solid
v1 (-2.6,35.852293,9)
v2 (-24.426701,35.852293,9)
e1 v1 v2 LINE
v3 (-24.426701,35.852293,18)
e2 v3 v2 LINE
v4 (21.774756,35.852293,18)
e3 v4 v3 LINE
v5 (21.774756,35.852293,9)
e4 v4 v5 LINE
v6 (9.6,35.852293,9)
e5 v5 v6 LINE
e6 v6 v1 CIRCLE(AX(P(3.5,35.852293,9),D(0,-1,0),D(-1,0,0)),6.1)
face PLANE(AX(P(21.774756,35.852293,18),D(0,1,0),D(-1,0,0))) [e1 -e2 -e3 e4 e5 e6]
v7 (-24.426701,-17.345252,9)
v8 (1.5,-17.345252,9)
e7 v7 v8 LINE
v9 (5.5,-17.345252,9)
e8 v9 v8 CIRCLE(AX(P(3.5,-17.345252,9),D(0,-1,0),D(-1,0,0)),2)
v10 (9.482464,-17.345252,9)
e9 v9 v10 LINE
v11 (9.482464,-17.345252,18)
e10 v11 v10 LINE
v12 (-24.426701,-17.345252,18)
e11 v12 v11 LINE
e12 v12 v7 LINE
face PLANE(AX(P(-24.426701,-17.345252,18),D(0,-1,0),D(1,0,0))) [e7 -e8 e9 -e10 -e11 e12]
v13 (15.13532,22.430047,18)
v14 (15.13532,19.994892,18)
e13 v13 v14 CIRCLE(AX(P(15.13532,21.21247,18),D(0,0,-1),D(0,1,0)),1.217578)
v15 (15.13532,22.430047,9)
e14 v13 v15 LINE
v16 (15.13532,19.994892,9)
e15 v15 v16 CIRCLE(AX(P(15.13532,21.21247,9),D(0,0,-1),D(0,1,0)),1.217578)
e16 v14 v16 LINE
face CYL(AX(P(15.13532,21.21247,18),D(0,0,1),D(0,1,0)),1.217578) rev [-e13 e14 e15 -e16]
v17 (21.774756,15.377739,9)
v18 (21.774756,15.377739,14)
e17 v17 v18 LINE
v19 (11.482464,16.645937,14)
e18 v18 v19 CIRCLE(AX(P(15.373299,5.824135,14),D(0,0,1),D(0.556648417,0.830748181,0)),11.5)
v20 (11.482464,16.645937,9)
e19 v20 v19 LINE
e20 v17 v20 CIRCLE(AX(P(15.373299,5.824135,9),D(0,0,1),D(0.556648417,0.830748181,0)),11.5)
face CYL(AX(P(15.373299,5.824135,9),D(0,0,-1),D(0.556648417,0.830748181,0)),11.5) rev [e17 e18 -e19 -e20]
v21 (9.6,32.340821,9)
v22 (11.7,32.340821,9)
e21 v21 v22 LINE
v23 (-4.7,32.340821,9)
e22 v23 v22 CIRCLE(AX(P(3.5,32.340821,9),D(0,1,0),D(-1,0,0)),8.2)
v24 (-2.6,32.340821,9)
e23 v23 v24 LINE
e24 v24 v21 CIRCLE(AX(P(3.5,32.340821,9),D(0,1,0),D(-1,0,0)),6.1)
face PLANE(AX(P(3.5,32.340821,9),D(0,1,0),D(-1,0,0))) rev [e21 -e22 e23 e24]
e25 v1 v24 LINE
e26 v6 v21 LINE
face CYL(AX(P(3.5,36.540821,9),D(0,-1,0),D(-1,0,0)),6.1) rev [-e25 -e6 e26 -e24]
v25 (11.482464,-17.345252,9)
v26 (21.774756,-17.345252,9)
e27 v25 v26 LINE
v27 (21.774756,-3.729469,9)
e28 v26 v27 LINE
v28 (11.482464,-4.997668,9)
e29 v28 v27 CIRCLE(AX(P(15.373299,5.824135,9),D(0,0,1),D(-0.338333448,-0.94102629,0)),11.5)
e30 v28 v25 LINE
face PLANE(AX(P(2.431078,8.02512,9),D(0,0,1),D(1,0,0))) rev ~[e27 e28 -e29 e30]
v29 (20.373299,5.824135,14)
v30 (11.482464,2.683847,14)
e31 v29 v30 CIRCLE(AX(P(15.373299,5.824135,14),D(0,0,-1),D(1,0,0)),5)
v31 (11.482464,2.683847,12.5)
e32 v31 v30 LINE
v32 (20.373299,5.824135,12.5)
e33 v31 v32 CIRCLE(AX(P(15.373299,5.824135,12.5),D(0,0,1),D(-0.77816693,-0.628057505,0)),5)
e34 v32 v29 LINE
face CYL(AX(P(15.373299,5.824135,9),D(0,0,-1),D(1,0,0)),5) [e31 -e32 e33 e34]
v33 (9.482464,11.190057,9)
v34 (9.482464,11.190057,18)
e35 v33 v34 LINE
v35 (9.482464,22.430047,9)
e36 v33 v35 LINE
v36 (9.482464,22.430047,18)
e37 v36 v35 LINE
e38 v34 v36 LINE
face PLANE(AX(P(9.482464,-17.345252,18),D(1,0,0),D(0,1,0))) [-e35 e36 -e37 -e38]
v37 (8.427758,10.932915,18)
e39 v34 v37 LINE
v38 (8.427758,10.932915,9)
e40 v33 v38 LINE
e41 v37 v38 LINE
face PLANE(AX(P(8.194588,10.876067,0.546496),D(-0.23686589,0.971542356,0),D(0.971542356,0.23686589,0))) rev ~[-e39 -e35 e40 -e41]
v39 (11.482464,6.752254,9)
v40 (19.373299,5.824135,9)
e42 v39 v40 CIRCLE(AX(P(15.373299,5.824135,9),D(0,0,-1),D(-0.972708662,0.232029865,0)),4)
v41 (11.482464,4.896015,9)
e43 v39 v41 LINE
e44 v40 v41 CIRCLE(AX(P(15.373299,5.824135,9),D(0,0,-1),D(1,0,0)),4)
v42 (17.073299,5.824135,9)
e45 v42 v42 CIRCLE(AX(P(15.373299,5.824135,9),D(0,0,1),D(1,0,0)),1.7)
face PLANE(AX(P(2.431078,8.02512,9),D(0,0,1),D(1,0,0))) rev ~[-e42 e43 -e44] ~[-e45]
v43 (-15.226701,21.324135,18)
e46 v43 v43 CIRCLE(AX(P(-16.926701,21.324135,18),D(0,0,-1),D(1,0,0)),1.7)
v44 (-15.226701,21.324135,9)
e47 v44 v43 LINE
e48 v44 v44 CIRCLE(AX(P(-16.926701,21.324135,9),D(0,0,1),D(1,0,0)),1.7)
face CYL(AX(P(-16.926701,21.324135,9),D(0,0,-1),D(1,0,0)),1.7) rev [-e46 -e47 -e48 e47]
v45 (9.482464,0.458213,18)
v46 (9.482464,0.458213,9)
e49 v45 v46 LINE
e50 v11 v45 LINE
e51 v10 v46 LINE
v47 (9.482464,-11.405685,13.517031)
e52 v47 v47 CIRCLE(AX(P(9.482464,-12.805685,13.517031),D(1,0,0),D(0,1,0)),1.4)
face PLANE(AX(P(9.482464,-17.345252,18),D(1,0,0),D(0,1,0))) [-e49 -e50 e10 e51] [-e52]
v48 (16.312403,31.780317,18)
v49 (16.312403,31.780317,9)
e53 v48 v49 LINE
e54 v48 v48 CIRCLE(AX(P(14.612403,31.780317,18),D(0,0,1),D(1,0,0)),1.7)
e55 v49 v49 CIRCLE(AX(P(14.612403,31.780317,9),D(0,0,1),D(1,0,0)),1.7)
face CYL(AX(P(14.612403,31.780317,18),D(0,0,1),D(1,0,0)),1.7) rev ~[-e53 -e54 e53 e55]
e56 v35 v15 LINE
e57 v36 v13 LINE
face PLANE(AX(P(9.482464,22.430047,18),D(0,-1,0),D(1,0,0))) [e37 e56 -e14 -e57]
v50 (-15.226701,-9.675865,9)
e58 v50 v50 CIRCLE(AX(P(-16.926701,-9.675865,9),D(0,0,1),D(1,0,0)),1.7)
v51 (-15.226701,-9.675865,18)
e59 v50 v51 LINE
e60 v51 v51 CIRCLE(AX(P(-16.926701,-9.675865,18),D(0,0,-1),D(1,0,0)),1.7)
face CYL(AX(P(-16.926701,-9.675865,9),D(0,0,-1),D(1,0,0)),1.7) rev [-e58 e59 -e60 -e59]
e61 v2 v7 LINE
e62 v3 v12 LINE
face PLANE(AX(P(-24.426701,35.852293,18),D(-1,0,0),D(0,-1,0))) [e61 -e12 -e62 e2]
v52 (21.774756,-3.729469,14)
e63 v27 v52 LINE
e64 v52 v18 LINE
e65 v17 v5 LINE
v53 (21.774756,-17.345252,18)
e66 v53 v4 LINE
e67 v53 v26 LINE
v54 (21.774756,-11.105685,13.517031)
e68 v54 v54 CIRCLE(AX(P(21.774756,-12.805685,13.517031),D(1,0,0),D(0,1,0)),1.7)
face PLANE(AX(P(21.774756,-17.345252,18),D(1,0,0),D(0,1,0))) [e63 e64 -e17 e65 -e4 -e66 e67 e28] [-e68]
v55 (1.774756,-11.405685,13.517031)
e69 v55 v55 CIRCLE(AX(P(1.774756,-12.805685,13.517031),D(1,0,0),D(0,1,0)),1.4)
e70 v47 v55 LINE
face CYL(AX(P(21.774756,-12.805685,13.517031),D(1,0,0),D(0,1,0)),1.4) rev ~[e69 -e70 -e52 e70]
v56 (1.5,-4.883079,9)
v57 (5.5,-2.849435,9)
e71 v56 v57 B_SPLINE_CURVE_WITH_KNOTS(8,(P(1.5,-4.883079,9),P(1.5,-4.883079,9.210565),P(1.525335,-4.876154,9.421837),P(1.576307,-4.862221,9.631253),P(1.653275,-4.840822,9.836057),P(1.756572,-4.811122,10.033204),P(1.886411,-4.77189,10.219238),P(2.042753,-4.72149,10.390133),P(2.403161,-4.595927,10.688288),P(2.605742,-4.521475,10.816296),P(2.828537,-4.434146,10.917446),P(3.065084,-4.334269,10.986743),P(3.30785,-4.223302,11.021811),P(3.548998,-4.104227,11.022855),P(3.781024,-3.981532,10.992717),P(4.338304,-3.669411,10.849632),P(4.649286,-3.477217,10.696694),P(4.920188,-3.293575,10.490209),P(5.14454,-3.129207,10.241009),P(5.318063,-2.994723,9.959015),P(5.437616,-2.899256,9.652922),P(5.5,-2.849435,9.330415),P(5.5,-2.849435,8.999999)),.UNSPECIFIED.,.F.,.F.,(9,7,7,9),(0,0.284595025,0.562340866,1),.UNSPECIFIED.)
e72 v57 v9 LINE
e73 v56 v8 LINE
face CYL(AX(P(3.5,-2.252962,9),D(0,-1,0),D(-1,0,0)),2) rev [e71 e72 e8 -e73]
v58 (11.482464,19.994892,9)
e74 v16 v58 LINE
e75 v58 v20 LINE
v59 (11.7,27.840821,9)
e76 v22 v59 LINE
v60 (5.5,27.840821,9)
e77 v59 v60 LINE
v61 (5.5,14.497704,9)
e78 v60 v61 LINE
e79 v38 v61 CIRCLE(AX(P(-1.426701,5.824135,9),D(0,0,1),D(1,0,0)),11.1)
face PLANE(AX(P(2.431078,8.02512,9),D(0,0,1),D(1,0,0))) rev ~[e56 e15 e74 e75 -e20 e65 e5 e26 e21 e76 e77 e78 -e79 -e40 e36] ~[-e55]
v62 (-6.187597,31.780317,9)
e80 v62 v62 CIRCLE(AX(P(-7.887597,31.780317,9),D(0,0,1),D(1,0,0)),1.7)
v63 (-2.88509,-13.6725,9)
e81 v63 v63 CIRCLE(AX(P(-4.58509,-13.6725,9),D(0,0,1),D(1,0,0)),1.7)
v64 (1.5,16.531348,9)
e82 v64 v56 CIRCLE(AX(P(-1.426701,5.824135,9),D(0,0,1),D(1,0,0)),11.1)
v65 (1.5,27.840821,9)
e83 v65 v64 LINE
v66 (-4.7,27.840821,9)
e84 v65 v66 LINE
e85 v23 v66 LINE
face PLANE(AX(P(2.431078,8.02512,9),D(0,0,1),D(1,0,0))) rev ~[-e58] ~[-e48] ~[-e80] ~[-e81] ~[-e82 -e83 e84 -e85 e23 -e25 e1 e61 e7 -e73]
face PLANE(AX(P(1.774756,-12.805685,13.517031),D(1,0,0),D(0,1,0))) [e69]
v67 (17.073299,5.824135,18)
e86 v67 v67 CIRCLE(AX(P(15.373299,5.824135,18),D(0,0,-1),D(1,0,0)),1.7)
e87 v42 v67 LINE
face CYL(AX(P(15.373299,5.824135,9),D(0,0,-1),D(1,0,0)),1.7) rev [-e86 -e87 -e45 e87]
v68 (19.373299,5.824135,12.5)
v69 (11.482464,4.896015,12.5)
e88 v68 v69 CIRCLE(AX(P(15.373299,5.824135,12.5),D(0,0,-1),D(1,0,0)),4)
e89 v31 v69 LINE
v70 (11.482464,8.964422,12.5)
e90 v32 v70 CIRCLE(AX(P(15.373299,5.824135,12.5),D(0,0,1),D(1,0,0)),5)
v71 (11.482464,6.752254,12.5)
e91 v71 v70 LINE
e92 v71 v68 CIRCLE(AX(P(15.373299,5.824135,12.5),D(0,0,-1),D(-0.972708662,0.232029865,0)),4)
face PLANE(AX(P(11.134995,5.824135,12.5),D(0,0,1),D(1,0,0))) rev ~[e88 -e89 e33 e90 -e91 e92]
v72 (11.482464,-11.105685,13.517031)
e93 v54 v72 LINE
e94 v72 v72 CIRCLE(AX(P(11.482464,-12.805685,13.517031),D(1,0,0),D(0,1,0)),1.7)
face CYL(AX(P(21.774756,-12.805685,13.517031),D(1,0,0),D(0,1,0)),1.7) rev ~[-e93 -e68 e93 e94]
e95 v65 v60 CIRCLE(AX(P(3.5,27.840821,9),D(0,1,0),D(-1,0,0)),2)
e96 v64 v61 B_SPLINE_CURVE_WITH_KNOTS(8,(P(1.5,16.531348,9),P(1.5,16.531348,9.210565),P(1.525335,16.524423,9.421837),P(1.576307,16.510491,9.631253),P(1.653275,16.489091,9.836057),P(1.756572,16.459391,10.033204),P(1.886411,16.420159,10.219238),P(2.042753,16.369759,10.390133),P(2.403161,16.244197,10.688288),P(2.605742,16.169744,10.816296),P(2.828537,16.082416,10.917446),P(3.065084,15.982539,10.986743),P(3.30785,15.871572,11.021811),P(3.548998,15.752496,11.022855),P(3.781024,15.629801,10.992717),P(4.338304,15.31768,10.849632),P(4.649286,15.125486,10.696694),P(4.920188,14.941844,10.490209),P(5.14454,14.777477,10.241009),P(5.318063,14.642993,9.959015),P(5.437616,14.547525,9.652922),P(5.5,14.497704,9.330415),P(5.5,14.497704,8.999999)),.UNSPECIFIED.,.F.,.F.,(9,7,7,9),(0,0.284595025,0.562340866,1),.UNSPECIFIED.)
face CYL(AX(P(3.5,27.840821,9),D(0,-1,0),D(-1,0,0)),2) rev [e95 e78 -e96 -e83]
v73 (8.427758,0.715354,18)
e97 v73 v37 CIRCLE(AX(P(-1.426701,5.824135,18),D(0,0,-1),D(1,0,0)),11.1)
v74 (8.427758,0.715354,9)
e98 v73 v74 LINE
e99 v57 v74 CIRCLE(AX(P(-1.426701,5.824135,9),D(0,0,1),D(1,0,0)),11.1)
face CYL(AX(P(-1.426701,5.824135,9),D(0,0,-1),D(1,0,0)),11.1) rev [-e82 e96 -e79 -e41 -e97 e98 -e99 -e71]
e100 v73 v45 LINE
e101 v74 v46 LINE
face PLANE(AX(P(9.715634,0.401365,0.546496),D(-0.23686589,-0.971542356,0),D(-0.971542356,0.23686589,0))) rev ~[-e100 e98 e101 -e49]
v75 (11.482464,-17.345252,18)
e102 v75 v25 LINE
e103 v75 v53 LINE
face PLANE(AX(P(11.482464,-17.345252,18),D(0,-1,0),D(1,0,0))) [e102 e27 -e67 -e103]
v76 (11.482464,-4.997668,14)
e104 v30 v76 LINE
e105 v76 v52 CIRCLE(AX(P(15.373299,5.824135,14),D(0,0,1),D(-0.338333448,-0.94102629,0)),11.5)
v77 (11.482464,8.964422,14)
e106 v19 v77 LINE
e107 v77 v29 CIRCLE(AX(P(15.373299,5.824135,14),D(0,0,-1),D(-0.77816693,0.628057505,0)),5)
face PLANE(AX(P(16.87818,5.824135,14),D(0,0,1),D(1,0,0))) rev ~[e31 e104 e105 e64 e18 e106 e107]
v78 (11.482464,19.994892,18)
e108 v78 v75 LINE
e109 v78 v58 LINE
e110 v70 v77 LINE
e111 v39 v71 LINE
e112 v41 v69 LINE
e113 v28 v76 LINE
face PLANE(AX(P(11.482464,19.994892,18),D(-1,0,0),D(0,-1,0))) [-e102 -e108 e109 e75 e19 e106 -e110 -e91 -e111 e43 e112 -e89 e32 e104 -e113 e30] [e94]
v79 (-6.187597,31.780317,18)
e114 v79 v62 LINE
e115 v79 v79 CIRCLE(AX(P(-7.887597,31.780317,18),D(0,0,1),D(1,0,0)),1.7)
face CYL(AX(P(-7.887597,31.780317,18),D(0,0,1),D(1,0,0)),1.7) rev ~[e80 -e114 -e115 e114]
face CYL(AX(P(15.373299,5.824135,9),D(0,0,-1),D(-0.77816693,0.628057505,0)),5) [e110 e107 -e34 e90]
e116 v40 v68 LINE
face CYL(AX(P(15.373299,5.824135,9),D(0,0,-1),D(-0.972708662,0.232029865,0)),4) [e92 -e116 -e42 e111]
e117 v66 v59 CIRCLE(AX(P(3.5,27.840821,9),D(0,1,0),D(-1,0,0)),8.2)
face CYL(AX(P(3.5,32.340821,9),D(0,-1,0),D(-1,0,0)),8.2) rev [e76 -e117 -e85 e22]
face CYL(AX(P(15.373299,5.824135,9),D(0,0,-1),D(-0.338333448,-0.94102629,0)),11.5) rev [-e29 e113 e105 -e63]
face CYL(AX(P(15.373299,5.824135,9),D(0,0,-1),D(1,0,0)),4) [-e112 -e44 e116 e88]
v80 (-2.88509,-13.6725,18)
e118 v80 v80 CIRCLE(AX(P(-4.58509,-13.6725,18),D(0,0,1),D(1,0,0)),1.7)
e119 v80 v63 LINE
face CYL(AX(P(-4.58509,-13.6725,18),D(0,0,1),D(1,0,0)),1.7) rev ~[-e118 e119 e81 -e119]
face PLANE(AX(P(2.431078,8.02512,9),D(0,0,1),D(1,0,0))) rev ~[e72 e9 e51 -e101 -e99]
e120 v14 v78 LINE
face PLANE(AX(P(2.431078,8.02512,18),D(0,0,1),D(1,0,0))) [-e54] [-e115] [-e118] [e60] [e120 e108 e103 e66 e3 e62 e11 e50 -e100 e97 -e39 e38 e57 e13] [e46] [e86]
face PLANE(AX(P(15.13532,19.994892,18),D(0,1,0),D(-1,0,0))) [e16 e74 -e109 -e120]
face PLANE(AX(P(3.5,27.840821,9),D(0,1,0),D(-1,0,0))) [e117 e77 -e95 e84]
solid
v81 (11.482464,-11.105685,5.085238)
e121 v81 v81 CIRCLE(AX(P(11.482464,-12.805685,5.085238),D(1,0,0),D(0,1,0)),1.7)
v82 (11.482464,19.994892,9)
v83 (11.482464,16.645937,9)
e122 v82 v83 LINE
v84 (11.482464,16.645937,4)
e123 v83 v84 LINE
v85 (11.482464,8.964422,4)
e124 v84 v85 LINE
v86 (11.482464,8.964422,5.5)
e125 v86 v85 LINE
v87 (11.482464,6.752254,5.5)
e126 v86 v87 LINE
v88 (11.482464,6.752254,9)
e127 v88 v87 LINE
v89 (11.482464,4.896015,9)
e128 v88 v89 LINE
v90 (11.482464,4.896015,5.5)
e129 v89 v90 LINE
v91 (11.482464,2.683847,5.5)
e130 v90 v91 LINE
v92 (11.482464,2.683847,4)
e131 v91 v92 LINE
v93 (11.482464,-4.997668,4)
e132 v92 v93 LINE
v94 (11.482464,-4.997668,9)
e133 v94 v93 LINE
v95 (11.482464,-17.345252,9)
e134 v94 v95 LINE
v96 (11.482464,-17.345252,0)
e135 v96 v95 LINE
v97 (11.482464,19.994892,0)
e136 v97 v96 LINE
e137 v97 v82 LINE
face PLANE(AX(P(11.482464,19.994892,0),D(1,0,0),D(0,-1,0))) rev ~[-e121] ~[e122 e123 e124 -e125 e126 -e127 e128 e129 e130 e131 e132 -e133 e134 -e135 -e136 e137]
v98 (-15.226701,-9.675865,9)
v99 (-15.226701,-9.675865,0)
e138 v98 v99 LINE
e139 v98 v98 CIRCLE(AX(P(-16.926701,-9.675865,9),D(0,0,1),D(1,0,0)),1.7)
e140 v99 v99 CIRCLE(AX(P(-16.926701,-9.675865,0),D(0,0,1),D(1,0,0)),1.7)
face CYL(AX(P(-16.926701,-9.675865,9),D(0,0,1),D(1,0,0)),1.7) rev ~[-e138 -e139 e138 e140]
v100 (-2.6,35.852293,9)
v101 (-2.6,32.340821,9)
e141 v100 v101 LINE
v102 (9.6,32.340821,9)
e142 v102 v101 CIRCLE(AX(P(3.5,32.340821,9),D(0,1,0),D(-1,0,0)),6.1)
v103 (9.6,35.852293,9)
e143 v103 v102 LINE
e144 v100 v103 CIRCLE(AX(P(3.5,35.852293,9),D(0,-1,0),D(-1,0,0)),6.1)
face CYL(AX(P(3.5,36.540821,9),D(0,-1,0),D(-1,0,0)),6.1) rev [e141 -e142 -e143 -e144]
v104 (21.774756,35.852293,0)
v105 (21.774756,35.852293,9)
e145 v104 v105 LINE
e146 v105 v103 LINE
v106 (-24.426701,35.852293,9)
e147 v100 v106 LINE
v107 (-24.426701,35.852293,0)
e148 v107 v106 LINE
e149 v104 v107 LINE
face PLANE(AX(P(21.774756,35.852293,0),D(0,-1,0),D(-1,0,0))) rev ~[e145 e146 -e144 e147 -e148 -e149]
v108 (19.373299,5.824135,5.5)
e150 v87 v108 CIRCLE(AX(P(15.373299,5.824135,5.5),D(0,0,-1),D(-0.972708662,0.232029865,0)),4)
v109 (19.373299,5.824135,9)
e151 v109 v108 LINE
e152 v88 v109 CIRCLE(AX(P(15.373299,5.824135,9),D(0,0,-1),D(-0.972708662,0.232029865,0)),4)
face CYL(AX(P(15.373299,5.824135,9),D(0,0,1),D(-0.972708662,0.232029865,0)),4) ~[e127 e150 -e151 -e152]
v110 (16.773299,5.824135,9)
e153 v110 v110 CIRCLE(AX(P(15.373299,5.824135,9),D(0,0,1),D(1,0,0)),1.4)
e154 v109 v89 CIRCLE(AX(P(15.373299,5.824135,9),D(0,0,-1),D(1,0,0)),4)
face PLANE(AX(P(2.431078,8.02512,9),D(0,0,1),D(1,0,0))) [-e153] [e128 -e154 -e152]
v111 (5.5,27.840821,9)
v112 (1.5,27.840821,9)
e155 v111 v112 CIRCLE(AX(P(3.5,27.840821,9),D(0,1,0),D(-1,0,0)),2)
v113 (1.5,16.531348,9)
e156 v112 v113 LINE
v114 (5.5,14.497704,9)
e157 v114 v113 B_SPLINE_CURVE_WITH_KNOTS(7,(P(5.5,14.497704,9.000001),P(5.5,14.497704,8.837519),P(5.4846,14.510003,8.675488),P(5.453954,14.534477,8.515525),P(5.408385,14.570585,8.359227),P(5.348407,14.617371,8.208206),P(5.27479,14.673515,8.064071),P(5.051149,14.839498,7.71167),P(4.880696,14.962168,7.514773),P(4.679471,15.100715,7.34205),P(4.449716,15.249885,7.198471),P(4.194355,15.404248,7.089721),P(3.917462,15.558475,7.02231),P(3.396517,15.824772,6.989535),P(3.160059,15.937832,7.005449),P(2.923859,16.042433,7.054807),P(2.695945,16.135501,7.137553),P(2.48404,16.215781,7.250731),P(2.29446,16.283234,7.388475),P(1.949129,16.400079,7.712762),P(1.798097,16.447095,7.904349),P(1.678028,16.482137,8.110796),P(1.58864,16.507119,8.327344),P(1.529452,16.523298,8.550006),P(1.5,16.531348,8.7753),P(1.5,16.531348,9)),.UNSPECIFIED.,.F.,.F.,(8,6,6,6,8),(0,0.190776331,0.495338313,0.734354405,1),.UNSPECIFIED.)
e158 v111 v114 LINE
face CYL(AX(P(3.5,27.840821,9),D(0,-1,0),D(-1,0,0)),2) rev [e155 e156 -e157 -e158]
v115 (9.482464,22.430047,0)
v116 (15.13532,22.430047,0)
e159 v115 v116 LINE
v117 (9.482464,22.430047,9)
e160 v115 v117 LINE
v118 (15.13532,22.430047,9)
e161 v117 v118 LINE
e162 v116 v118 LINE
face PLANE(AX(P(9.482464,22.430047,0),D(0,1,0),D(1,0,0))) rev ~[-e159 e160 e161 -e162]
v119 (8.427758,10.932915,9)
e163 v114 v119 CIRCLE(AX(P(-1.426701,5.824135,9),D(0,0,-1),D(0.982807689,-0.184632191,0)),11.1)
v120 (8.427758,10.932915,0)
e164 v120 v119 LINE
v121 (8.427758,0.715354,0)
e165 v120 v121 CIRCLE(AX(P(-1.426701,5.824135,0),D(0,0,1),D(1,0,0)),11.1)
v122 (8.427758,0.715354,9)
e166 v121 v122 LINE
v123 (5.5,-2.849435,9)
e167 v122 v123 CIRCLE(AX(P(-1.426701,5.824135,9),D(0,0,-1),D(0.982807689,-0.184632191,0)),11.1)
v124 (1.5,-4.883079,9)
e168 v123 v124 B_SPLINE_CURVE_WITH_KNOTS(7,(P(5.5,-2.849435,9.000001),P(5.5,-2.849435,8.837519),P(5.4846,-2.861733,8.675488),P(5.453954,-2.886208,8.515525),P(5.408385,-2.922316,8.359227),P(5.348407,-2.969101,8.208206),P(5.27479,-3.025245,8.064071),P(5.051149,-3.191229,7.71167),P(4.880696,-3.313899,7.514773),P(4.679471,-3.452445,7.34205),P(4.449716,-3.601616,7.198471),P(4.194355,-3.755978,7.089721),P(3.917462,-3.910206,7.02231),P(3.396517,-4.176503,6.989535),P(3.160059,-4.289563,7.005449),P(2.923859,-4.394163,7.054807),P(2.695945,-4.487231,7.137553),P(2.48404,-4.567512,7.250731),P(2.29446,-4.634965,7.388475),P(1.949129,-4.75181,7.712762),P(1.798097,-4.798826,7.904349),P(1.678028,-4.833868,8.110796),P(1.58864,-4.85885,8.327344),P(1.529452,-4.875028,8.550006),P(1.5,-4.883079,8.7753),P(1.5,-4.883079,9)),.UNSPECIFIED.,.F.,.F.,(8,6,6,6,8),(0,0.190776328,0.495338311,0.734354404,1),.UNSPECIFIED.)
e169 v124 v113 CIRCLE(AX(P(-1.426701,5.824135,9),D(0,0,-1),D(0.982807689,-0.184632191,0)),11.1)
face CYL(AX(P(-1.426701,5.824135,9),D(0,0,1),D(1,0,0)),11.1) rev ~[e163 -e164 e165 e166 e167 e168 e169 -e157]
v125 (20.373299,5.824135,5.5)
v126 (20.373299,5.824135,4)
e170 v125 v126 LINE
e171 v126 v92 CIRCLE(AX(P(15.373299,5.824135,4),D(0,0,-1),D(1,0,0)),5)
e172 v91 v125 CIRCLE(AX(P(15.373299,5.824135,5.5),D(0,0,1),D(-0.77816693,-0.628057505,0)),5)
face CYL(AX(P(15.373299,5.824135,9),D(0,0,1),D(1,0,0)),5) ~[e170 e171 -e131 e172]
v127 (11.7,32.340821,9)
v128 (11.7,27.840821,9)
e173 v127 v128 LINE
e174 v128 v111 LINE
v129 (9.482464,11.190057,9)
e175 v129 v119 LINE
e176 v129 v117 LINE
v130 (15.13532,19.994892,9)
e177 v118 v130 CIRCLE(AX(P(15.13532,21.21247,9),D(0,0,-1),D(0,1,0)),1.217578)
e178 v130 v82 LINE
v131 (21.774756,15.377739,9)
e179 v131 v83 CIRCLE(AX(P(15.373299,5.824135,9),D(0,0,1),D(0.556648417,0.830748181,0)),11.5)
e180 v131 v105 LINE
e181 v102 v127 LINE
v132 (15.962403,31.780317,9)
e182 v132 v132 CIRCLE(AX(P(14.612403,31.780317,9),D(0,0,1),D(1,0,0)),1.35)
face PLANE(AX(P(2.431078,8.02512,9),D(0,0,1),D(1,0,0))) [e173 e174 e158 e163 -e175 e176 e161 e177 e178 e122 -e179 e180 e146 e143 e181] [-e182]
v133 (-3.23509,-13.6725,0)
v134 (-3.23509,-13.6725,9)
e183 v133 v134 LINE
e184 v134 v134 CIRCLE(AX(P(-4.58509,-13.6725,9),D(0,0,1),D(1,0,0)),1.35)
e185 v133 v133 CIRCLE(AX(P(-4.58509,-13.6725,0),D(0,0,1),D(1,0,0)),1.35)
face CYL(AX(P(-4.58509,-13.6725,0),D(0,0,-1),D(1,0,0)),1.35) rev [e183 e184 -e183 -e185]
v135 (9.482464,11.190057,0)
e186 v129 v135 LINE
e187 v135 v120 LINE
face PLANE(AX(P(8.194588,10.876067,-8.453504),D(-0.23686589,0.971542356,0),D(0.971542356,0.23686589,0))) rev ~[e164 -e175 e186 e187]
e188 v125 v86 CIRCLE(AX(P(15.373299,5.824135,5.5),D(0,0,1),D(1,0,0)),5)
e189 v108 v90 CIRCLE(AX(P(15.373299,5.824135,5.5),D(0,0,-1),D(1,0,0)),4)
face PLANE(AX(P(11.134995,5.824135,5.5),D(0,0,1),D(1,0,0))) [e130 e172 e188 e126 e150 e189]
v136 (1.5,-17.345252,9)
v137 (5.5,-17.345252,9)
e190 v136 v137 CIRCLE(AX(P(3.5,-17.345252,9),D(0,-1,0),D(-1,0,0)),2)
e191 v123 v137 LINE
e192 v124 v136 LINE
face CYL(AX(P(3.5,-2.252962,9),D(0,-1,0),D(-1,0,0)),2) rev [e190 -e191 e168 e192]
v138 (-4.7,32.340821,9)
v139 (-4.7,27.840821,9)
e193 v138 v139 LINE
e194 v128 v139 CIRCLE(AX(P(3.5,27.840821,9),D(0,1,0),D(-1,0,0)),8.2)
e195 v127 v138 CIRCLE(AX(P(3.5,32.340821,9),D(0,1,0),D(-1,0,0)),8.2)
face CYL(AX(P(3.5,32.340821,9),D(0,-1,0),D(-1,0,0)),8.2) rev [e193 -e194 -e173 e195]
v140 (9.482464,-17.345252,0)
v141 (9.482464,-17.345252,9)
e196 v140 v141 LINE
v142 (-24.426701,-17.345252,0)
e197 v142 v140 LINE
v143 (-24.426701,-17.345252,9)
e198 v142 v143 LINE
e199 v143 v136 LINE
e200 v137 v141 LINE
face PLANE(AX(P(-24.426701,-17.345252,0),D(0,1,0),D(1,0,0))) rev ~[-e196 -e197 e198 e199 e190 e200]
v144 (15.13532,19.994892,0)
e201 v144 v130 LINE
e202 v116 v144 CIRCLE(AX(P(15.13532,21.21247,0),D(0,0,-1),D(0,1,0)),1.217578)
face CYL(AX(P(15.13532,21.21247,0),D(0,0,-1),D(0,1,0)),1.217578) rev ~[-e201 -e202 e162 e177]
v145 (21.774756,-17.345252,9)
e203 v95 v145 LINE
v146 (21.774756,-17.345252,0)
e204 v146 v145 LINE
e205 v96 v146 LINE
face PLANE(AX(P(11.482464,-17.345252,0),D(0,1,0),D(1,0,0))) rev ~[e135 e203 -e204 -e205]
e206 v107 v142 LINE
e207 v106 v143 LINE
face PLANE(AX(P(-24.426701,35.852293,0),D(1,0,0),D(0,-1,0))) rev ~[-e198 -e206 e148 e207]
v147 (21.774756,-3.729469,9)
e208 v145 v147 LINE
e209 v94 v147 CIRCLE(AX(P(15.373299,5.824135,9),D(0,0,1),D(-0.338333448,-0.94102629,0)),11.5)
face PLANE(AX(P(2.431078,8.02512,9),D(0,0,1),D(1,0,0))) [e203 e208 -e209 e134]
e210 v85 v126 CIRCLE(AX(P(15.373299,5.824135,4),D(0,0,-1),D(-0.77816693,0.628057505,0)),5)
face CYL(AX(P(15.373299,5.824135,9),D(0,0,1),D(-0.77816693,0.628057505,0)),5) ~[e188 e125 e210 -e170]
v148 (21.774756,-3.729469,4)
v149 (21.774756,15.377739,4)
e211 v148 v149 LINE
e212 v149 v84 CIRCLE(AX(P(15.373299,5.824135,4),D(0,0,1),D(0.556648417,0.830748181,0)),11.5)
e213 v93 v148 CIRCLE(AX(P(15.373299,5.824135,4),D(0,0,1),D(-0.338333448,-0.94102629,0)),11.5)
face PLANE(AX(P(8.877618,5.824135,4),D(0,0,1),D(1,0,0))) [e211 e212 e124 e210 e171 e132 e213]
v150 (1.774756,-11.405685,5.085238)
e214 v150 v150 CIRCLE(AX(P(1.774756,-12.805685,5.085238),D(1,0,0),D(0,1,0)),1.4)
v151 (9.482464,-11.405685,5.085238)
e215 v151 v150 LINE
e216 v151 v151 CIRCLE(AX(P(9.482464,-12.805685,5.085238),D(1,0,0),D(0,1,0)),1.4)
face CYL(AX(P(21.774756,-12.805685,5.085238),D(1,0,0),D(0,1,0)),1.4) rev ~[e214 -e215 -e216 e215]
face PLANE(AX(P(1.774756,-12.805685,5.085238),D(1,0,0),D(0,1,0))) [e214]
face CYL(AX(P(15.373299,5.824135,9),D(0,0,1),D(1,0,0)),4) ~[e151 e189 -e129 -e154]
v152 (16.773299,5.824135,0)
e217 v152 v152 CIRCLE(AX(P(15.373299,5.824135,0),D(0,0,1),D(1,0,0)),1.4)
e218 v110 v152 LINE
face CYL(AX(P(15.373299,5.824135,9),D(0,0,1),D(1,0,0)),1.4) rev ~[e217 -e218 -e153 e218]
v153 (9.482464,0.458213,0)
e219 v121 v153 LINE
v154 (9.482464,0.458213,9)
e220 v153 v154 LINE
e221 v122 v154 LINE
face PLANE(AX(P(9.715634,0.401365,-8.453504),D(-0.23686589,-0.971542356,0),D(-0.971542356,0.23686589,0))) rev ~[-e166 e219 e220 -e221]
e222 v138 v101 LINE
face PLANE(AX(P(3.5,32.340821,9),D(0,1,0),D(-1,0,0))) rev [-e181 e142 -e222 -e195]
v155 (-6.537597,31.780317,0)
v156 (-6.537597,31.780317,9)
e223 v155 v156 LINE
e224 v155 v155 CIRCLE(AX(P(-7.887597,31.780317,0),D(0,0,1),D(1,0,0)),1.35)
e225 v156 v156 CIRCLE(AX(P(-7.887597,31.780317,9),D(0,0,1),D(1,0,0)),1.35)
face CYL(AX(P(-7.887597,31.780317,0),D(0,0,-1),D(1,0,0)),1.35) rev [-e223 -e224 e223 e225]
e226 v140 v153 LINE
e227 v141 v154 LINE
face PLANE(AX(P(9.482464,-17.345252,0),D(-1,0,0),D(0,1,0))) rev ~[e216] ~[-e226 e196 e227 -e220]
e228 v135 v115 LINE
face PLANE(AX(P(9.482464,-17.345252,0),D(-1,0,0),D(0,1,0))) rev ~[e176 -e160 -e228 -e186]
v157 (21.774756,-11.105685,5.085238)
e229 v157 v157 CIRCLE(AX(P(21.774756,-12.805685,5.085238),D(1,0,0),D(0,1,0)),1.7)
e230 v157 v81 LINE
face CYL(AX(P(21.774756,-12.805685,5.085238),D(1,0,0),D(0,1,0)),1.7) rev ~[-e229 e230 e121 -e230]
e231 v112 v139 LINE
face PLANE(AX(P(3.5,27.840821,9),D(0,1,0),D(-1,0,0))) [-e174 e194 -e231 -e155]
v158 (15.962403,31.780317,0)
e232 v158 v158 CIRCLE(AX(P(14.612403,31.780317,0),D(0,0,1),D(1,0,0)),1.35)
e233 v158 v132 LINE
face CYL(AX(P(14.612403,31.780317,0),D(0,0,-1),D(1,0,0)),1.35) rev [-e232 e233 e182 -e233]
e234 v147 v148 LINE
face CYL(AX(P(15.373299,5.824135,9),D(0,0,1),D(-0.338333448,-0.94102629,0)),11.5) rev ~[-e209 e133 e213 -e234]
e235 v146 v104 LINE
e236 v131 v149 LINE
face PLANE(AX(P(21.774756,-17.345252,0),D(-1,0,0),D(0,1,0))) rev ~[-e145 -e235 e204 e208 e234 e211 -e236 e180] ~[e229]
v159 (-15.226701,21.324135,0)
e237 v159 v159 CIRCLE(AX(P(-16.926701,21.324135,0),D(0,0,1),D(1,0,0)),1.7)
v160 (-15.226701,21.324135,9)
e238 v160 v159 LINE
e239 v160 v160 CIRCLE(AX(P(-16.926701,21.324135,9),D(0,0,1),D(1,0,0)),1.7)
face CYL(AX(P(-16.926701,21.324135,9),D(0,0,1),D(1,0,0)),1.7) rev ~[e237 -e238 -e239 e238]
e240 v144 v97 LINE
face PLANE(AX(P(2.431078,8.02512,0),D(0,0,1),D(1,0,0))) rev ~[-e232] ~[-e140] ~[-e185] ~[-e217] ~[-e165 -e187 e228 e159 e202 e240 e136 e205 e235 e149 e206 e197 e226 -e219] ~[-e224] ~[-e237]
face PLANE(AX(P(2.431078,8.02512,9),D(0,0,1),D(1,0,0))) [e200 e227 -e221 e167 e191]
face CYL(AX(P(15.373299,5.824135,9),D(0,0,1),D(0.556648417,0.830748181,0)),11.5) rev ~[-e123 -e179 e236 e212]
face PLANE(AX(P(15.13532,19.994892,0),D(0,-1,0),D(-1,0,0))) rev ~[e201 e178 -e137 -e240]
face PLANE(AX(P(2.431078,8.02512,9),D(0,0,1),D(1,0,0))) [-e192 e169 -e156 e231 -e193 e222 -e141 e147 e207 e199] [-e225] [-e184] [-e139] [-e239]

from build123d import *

# Parameters (mm, degrees)
F0_R           = 1.7
F0_R_2         = 1.35
F1_DEPTH       = 9
F2_R           = 11.1
F2_R_2         = 1.7
F3_DEPTH       = 9.001
F5_DEPTH       = 5
F6_DEPTH       = 3.5
F11_DEPTH      = 9
F13_DEPTH      = 9.001
F14_DEPTH      = 5
F15_DEPTH      = 3.5
F18_R          = 1.4
F19_DEPTH      = 20
F18_R_2        = 1.7
F20_DEPTH      = 11
F21_DEPTH      = 20
F22_DEPTH      = 11
F4_R           = 1.4
F23_DEPTH      = 9.0010001
F4_R_2         = 1.7
F24_DEPTH      = 9.0010001
F25_T1_DEPTH   = 25.9070070941
F25_2_T1_DEPTH = 25.9070070941


# Not quite as in the source:
# - a fillet or chamfer that OpenCascade refuses, or shapes differently, is made with other operations: its cross-section is extruded or revolved along the edge and cut away or added


with BuildPart() as f1:
    # F0 (on Top) → F1 (new body)
    with BuildSketch(Plane.XY):
        with BuildLine():
            Line((21.7747555523, 35.8522933333), (-24.4267012457, 35.8522933333))
            Line((-24.4267012457, 35.8522933333), (-24.4267012457, -17.3452516382))
            Line((-24.4267012457, -17.3452516382), (9.4824641046, -17.3452516382))
            Line((9.4824641046, -17.3452516382), (9.4824641046, 22.4300473309))
            Line((9.4824641046, 22.4300473309), (15.1353199035, 22.4300473309))
            ThreePointArc((15.1353199035, 22.4300473309), (16.352897448, 21.2124697864), (15.1353199035, 19.9948922419))
            Line((15.1353199035, 19.9948922419), (11.4824641046, 19.9948922419))
            Line((11.4824641046, 19.9948922419), (11.4824641046, -17.3452516382))
            Line((11.4824641046, -17.3452516382), (21.7747555523, -17.3452516382))
            Line((21.7747555523, -17.3452516382), (21.7747555523, 35.8522933333))
        make_face()
        with Locations((-4.5850900933, -13.6724999174)):
            Circle(F0_R, mode=Mode.SUBTRACT)
        with Locations((-7.8875971958, 31.7803174257)):
            Circle(F0_R, mode=Mode.SUBTRACT)
        with Locations((14.6124028042, 31.7803174257)):
            Circle(F0_R, mode=Mode.SUBTRACT)
        with Locations((-7.8875971958, 31.7803174257)):
            Circle(F0_R)
        with Locations((-7.8875971958, 31.7803174257)):
            Circle(F0_R_2, mode=Mode.SUBTRACT)
        with Locations((14.6124028042, 31.7803174257)):
            Circle(F0_R)
        with Locations((14.6124028042, 31.7803174257)):
            Circle(F0_R_2, mode=Mode.SUBTRACT)
        with Locations((-4.5850900933, -13.6724999174)):
            Circle(F0_R)
        with Locations((-4.5850900933, -13.6724999174)):
            Circle(F0_R_2, mode=Mode.SUBTRACT)
    extrude(amount=F1_DEPTH)

    # F2 (on face) → F3 (cut, through all)
    with BuildSketch(Plane.XY.offset(9)):
        with Locations((-1.4267012457, 5.8241346851)):
            Circle(F2_R)
        with Locations((-16.9267012457, 21.3241346851)):
            Circle(F2_R_2)
        with Locations((-16.9267012457, -9.6758653149)):
            Circle(F2_R_2)
    extrude(amount=-F3_DEPTH, mode=Mode.SUBTRACT)

    # F4 (on face) → F5 (cut)
    with BuildSketch(Plane.XY.offset(9)):
        with BuildLine():
            Line((11.4824641046, 8.9644222084), (11.4824641046, 16.6459370178))
            ThreePointArc((11.4824641046, 16.6459370178), (10.4596854864, 16.2215576665), (9.4824641046, 15.700777188))
            Line((9.4824641046, 15.700777188), (9.4824641046, 7.873552007))
            ThreePointArc((9.4824641046, 7.873552007), (8.4835434412, 10.8238397011), (6.7042511353, 13.380430959))
            ThreePointArc((6.7042511353, 13.380430959), (3.8732987543, 5.8241346851), (6.7042511353, -1.7321615888))
            ThreePointArc((6.7042511353, -1.7321615888), (8.4835434412, 0.8244296691), (9.4824641046, 3.7747173632))
            Line((9.4824641046, 3.7747173632), (9.4824641046, -4.0525078178))
            ThreePointArc((9.4824641046, -4.0525078178), (10.4596854864, -4.5732882963), (11.4824641046, -4.9976676476))
            Line((11.4824641046, -4.9976676476), (11.4824641046, 2.6838471618))
            ThreePointArc((11.4824641046, 2.6838471618), (10.3732987543, 5.8241346851), (11.4824641046, 8.9644222084))
        make_face()
        with BuildLine():
            Line((21.7747555523, -3.7294693921), (21.7747555523, 15.3777387623))
            ThreePointArc((21.7747555523, 15.3777387623), (16.7796726722, 17.2378156165), (11.4824641046, 16.6459370178))
            Line((11.4824641046, 16.6459370178), (11.4824641046, 8.9644222084))
            ThreePointArc((11.4824641046, 8.9644222084), (17.0385054609, 10.5386958125), (20.3732987543, 5.8241346851))
            ThreePointArc((20.3732987543, 5.8241346851), (17.0385054609, 1.1095735577), (11.4824641046, 2.6838471618))
            Line((11.4824641046, 2.6838471618), (11.4824641046, -4.9976676476))
            ThreePointArc((11.4824641046, -4.9976676476), (16.7796726722, -5.5895462463), (21.7747555523, -3.7294693921))
        make_face()
    extrude(amount=-F5_DEPTH, mode=Mode.SUBTRACT)

    # F4 (on face) → F6 (cut)
    with BuildSketch(Plane.XY.offset(9)):
        with BuildLine():
            Line((11.4824641046, 6.7522541434), (11.4824641046, 8.9644222084))
            ThreePointArc((11.4824641046, 8.9644222084), (10.3732987543, 5.8241346851), (11.4824641046, 2.6838471618))
            Line((11.4824641046, 2.6838471618), (11.4824641046, 4.8960152268))
            ThreePointArc((11.4824641046, 4.8960152268), (11.3732987543, 5.8241346851), (11.4824641046, 6.7522541434))
        make_face()
        with BuildLine():
            ThreePointArc((20.3732987543, 5.8241346851), (17.0385054609, 10.5386958125), (11.4824641046, 8.9644222084))
            Line((11.4824641046, 8.9644222084), (11.4824641046, 6.7522541434))
            ThreePointArc((11.4824641046, 6.7522541434), (15.8405574628, 9.7967496047), (19.3732987543, 5.8241346851))
            ThreePointArc((19.3732987543, 5.8241346851), (15.8405574628, 1.8515197655), (11.4824641046, 4.8960152268))
            Line((11.4824641046, 4.8960152268), (11.4824641046, 2.6838471618))
            ThreePointArc((11.4824641046, 2.6838471618), (17.0385054609, 1.1095735577), (20.3732987543, 5.8241346851))
        make_face()
    extrude(amount=-F6_DEPTH, mode=Mode.SUBTRACT)


with BuildPart() as f8:
    # F7 (on face) → F8 (revolve)
    with BuildSketch(Plane.XY.offset(9)):
        Polygon((1.5, 13.6120927054), (3.5, 13.6120927054), (3.5, 36.5408211946), (-2.6, 36.5408211946), (-2.6, 32.3408211946), (-4.7, 32.3408211946), (-4.7, 27.8408211946), (1.5, 27.8408211946), align=None)
    revolve(axis=Axis((3.5, 25.07645695, 9), (0, 1, 0)))


with BuildPart() as f8b:
    # F7 (on face) → F8, piece 2 (revolve)
    with BuildSketch(Plane.XY.offset(9)):
        Polygon((3.5, -24.8925518245), (3.5, -1.9638233352), (1.9, -1.9638233352), (1.9, -2.2529622074), (1.5, -2.2529622074), (1.5, -6.4595437571), (1.5, -11.6595437571), (1.5, -24.8925518245), align=None)
    revolve(axis=Axis((3.5, 25.07645695, 9), (0, 1, 0)))


with BuildPart() as f1_1:
    add(f1.part)

    # F9: cut F8
    add(f8.part, mode=Mode.SUBTRACT)

    # F10: cut F8b
    add(f8b.part, mode=Mode.SUBTRACT)

    # F18 (on face) → F21 (cut)
    with BuildSketch(Plane.YZ.offset(21.7747555523)):
        with Locations((-12.805685401, 5.0852382556)):
            Circle(F18_R)
    extrude(amount=-F21_DEPTH, mode=Mode.SUBTRACT)

    # F18 (on face) → F22 (cut)
    with BuildSketch(Plane.YZ.offset(21.7747555523)):
        with Locations((-12.805685401, 5.0852382556)):
            Circle(F18_R_2)
        with Locations((-12.805685401, 5.0852382556)):
            Circle(F18_R, mode=Mode.SUBTRACT)
    extrude(amount=-F22_DEPTH, mode=Mode.SUBTRACT)

    # F4 (on face) → F23 (cut, through all)
    with BuildSketch(Plane.XY.offset(9)):
        with Locations((15.3732987543, 5.8241346851)):
            Circle(F4_R)
    extrude(amount=-F23_DEPTH, mode=Mode.SUBTRACT)

    # F25: chamfer of 6 on 2 edges, made by hand

    # F25_s2 → F25_t1 (cut)
    with BuildSketch(Plane.XY.offset(-8.453503547)):
        with BuildLine():
            Line((8.1945876053, 10.8760673026), (9.7156342702, 11.2469045278))
            Line((9.7156342702, 11.2469045278), (9.8356342702, 11.2469045278))
            ThreePointArc((9.8356342702, 11.2469045278), (9.6024641046, 9.5602282674), (9.6024641046, 7.873552007))
            Line((9.6024641046, 7.873552007), (9.3645271819, 7.8513961441))
            ThreePointArc((9.3645271819, 7.8513961441), (8.9500807638, 9.4133957688), (8.0880529132, 10.8208372439))
            Line((8.0880529132, 10.8208372439), (8.1945876053, 10.8760673026))
        make_face()
        with BuildLine():
            Line((9.7156342702, 0.4013648424), (8.1945876053, 0.7722020676))
            Line((8.1945876053, 0.7722020676), (8.0880529132, 0.8274321263))
            ThreePointArc((8.0880529132, 0.8274321263), (8.9500807638, 2.2348736014), (9.3645271819, 3.7968732261))
            Line((9.3645271819, 3.7968732261), (9.6024641046, 3.7747173632))
            ThreePointArc((9.6024641046, 3.7747173632), (9.6024641046, 2.0880411028), (9.8356342702, 0.4013648424))
            Line((9.8356342702, 0.4013648424), (9.7156342702, 0.4013648424))
        make_face()
    extrude(amount=F25_T1_DEPTH, mode=Mode.SUBTRACT)


with BuildPart() as f11:
    # F0 (on Top) → F11 (new body)
    with BuildSketch(Plane.XY):
        with BuildLine():
            Line((21.7747555523, 35.8522933333), (-24.4267012457, 35.8522933333))
            Line((-24.4267012457, 35.8522933333), (-24.4267012457, -17.3452516382))
            Line((-24.4267012457, -17.3452516382), (9.4824641046, -17.3452516382))
            Line((9.4824641046, -17.3452516382), (9.4824641046, 22.4300473309))
            Line((9.4824641046, 22.4300473309), (15.1353199035, 22.4300473309))
            ThreePointArc((15.1353199035, 22.4300473309), (16.352897448, 21.2124697864), (15.1353199035, 19.9948922419))
            Line((15.1353199035, 19.9948922419), (11.4824641046, 19.9948922419))
            Line((11.4824641046, 19.9948922419), (11.4824641046, -17.3452516382))
            Line((11.4824641046, -17.3452516382), (21.7747555523, -17.3452516382))
            Line((21.7747555523, -17.3452516382), (21.7747555523, 35.8522933333))
        make_face()
        with Locations((-4.5850900933, -13.6724999174)):
            Circle(F0_R, mode=Mode.SUBTRACT)
        with Locations((-7.8875971958, 31.7803174257)):
            Circle(F0_R, mode=Mode.SUBTRACT)
        with Locations((14.6124028042, 31.7803174257)):
            Circle(F0_R, mode=Mode.SUBTRACT)
    extrude(amount=-F11_DEPTH)


with BuildPart() as f11_1:
    # F12: moved
    add(f11.part.moved(Location((0, 0, 18))))


with BuildPart() as f13_tool:
    # F2 (on face) → F13 (new body, through all)
    with BuildSketch(Plane.XY.offset(9)):
        with Locations((-1.4267012457, 5.8241346851)):
            Circle(F2_R)
        with Locations((-16.9267012457, 21.3241346851)):
            Circle(F2_R_2)
        with Locations((-16.9267012457, -9.6758653149)):
            Circle(F2_R_2)
    extrude(amount=F13_DEPTH)


with BuildPart() as f8_1:
    add(f8.part)

    # F13: cut by f13_tool
    add(f13_tool.part, mode=Mode.SUBTRACT)


with BuildPart() as f8b_1:
    add(f8b.part)

    # F13: cut by f13_tool
    add(f13_tool.part, mode=Mode.SUBTRACT)


with BuildPart() as f11_2:
    add(f11_1.part)

    # F13: cut by f13_tool
    add(f13_tool.part, mode=Mode.SUBTRACT)

    # F4 (on face) → F14 (cut)
    with BuildSketch(Plane.XY.offset(9)):
        with BuildLine():
            Line((21.7747555523, -3.7294693921), (21.7747555523, 15.3777387623))
            ThreePointArc((21.7747555523, 15.3777387623), (16.7796726722, 17.2378156165), (11.4824641046, 16.6459370178))
            Line((11.4824641046, 16.6459370178), (11.4824641046, 8.9644222084))
            ThreePointArc((11.4824641046, 8.9644222084), (17.0385054609, 10.5386958125), (20.3732987543, 5.8241346851))
            ThreePointArc((20.3732987543, 5.8241346851), (17.0385054609, 1.1095735577), (11.4824641046, 2.6838471618))
            Line((11.4824641046, 2.6838471618), (11.4824641046, -4.9976676476))
            ThreePointArc((11.4824641046, -4.9976676476), (16.7796726722, -5.5895462463), (21.7747555523, -3.7294693921))
        make_face()
    extrude(amount=F14_DEPTH, mode=Mode.SUBTRACT)

    # F4 (on face) → F15 (cut)
    with BuildSketch(Plane.XY.offset(9)):
        with BuildLine():
            Line((11.4824641046, 6.7522541434), (11.4824641046, 8.9644222084))
            ThreePointArc((11.4824641046, 8.9644222084), (10.3732987543, 5.8241346851), (11.4824641046, 2.6838471618))
            Line((11.4824641046, 2.6838471618), (11.4824641046, 4.8960152268))
            ThreePointArc((11.4824641046, 4.8960152268), (11.3732987543, 5.8241346851), (11.4824641046, 6.7522541434))
        make_face()
        with BuildLine():
            ThreePointArc((20.3732987543, 5.8241346851), (17.0385054609, 10.5386958125), (11.4824641046, 8.9644222084))
            Line((11.4824641046, 8.9644222084), (11.4824641046, 6.7522541434))
            ThreePointArc((11.4824641046, 6.7522541434), (15.8405574628, 9.7967496047), (19.3732987543, 5.8241346851))
            ThreePointArc((19.3732987543, 5.8241346851), (15.8405574628, 1.8515197655), (11.4824641046, 4.8960152268))
            Line((11.4824641046, 4.8960152268), (11.4824641046, 2.6838471618))
            ThreePointArc((11.4824641046, 2.6838471618), (17.0385054609, 1.1095735577), (20.3732987543, 5.8241346851))
        make_face()
    extrude(amount=F15_DEPTH, mode=Mode.SUBTRACT)

    # F16: cut F8
    add(f8_1.part, mode=Mode.SUBTRACT)

    # F17: cut F8b
    add(f8b_1.part, mode=Mode.SUBTRACT)

    # F18 (on face) → F19 (cut)
    with BuildSketch(Plane.YZ.offset(21.7747555523)):
        with Locations((-12.805685401, 13.5170314461)):
            Circle(F18_R)
    extrude(amount=-F19_DEPTH, mode=Mode.SUBTRACT)

    # F18 (on face) → F20 (cut)
    with BuildSketch(Plane.YZ.offset(21.7747555523)):
        with Locations((-12.805685401, 13.5170314461)):
            Circle(F18_R_2)
        with Locations((-12.805685401, 13.5170314461)):
            Circle(F18_R, mode=Mode.SUBTRACT)
    extrude(amount=-F20_DEPTH, mode=Mode.SUBTRACT)

    # F4 (on face) → F24 (cut, through all)
    with BuildSketch(Plane.XY.offset(9)):
        with Locations((15.3732987543, 5.8241346851)):
            Circle(F4_R_2)
        with Locations((15.3732987543, 5.8241346851)):
            Circle(F4_R, mode=Mode.SUBTRACT)
        with Locations((15.3732987543, 5.8241346851)):
            Circle(F4_R)
    extrude(amount=F24_DEPTH, mode=Mode.SUBTRACT)

    # F25#2: chamfer of 6 on 2 edges, made by hand

    # F25_2_s2 → F25_2_t1 (cut)
    with BuildSketch(Plane.XY.offset(0.546496453)):
        with BuildLine():
            Line((8.1945876053, 10.8760673026), (9.7156342702, 11.2469045278))
            Line((9.7156342702, 11.2469045278), (9.8356342702, 11.2469045278))
            ThreePointArc((9.8356342702, 11.2469045278), (9.6024641046, 9.5602282674), (9.6024641046, 7.873552007))
            Line((9.6024641046, 7.873552007), (9.3645271819, 7.8513961441))
            ThreePointArc((9.3645271819, 7.8513961441), (8.9500807638, 9.4133957688), (8.0880529132, 10.8208372439))
            Line((8.0880529132, 10.8208372439), (8.1945876053, 10.8760673026))
        make_face()
        with BuildLine():
            Line((9.7156342702, 0.4013648424), (8.1945876053, 0.7722020676))
            Line((8.1945876053, 0.7722020676), (8.0880529132, 0.8274321263))
            ThreePointArc((8.0880529132, 0.8274321263), (8.9500807638, 2.2348736014), (9.3645271819, 3.7968732261))
            Line((9.3645271819, 3.7968732261), (9.6024641046, 3.7747173632))
            ThreePointArc((9.6024641046, 3.7747173632), (9.6024641046, 2.0880411028), (9.8356342702, 0.4013648424))
            Line((9.8356342702, 0.4013648424), (9.7156342702, 0.4013648424))
        make_face()
    extrude(amount=F25_2_T1_DEPTH, mode=Mode.SUBTRACT)


solid = Compound([f1_1.part, f11_2.part])
